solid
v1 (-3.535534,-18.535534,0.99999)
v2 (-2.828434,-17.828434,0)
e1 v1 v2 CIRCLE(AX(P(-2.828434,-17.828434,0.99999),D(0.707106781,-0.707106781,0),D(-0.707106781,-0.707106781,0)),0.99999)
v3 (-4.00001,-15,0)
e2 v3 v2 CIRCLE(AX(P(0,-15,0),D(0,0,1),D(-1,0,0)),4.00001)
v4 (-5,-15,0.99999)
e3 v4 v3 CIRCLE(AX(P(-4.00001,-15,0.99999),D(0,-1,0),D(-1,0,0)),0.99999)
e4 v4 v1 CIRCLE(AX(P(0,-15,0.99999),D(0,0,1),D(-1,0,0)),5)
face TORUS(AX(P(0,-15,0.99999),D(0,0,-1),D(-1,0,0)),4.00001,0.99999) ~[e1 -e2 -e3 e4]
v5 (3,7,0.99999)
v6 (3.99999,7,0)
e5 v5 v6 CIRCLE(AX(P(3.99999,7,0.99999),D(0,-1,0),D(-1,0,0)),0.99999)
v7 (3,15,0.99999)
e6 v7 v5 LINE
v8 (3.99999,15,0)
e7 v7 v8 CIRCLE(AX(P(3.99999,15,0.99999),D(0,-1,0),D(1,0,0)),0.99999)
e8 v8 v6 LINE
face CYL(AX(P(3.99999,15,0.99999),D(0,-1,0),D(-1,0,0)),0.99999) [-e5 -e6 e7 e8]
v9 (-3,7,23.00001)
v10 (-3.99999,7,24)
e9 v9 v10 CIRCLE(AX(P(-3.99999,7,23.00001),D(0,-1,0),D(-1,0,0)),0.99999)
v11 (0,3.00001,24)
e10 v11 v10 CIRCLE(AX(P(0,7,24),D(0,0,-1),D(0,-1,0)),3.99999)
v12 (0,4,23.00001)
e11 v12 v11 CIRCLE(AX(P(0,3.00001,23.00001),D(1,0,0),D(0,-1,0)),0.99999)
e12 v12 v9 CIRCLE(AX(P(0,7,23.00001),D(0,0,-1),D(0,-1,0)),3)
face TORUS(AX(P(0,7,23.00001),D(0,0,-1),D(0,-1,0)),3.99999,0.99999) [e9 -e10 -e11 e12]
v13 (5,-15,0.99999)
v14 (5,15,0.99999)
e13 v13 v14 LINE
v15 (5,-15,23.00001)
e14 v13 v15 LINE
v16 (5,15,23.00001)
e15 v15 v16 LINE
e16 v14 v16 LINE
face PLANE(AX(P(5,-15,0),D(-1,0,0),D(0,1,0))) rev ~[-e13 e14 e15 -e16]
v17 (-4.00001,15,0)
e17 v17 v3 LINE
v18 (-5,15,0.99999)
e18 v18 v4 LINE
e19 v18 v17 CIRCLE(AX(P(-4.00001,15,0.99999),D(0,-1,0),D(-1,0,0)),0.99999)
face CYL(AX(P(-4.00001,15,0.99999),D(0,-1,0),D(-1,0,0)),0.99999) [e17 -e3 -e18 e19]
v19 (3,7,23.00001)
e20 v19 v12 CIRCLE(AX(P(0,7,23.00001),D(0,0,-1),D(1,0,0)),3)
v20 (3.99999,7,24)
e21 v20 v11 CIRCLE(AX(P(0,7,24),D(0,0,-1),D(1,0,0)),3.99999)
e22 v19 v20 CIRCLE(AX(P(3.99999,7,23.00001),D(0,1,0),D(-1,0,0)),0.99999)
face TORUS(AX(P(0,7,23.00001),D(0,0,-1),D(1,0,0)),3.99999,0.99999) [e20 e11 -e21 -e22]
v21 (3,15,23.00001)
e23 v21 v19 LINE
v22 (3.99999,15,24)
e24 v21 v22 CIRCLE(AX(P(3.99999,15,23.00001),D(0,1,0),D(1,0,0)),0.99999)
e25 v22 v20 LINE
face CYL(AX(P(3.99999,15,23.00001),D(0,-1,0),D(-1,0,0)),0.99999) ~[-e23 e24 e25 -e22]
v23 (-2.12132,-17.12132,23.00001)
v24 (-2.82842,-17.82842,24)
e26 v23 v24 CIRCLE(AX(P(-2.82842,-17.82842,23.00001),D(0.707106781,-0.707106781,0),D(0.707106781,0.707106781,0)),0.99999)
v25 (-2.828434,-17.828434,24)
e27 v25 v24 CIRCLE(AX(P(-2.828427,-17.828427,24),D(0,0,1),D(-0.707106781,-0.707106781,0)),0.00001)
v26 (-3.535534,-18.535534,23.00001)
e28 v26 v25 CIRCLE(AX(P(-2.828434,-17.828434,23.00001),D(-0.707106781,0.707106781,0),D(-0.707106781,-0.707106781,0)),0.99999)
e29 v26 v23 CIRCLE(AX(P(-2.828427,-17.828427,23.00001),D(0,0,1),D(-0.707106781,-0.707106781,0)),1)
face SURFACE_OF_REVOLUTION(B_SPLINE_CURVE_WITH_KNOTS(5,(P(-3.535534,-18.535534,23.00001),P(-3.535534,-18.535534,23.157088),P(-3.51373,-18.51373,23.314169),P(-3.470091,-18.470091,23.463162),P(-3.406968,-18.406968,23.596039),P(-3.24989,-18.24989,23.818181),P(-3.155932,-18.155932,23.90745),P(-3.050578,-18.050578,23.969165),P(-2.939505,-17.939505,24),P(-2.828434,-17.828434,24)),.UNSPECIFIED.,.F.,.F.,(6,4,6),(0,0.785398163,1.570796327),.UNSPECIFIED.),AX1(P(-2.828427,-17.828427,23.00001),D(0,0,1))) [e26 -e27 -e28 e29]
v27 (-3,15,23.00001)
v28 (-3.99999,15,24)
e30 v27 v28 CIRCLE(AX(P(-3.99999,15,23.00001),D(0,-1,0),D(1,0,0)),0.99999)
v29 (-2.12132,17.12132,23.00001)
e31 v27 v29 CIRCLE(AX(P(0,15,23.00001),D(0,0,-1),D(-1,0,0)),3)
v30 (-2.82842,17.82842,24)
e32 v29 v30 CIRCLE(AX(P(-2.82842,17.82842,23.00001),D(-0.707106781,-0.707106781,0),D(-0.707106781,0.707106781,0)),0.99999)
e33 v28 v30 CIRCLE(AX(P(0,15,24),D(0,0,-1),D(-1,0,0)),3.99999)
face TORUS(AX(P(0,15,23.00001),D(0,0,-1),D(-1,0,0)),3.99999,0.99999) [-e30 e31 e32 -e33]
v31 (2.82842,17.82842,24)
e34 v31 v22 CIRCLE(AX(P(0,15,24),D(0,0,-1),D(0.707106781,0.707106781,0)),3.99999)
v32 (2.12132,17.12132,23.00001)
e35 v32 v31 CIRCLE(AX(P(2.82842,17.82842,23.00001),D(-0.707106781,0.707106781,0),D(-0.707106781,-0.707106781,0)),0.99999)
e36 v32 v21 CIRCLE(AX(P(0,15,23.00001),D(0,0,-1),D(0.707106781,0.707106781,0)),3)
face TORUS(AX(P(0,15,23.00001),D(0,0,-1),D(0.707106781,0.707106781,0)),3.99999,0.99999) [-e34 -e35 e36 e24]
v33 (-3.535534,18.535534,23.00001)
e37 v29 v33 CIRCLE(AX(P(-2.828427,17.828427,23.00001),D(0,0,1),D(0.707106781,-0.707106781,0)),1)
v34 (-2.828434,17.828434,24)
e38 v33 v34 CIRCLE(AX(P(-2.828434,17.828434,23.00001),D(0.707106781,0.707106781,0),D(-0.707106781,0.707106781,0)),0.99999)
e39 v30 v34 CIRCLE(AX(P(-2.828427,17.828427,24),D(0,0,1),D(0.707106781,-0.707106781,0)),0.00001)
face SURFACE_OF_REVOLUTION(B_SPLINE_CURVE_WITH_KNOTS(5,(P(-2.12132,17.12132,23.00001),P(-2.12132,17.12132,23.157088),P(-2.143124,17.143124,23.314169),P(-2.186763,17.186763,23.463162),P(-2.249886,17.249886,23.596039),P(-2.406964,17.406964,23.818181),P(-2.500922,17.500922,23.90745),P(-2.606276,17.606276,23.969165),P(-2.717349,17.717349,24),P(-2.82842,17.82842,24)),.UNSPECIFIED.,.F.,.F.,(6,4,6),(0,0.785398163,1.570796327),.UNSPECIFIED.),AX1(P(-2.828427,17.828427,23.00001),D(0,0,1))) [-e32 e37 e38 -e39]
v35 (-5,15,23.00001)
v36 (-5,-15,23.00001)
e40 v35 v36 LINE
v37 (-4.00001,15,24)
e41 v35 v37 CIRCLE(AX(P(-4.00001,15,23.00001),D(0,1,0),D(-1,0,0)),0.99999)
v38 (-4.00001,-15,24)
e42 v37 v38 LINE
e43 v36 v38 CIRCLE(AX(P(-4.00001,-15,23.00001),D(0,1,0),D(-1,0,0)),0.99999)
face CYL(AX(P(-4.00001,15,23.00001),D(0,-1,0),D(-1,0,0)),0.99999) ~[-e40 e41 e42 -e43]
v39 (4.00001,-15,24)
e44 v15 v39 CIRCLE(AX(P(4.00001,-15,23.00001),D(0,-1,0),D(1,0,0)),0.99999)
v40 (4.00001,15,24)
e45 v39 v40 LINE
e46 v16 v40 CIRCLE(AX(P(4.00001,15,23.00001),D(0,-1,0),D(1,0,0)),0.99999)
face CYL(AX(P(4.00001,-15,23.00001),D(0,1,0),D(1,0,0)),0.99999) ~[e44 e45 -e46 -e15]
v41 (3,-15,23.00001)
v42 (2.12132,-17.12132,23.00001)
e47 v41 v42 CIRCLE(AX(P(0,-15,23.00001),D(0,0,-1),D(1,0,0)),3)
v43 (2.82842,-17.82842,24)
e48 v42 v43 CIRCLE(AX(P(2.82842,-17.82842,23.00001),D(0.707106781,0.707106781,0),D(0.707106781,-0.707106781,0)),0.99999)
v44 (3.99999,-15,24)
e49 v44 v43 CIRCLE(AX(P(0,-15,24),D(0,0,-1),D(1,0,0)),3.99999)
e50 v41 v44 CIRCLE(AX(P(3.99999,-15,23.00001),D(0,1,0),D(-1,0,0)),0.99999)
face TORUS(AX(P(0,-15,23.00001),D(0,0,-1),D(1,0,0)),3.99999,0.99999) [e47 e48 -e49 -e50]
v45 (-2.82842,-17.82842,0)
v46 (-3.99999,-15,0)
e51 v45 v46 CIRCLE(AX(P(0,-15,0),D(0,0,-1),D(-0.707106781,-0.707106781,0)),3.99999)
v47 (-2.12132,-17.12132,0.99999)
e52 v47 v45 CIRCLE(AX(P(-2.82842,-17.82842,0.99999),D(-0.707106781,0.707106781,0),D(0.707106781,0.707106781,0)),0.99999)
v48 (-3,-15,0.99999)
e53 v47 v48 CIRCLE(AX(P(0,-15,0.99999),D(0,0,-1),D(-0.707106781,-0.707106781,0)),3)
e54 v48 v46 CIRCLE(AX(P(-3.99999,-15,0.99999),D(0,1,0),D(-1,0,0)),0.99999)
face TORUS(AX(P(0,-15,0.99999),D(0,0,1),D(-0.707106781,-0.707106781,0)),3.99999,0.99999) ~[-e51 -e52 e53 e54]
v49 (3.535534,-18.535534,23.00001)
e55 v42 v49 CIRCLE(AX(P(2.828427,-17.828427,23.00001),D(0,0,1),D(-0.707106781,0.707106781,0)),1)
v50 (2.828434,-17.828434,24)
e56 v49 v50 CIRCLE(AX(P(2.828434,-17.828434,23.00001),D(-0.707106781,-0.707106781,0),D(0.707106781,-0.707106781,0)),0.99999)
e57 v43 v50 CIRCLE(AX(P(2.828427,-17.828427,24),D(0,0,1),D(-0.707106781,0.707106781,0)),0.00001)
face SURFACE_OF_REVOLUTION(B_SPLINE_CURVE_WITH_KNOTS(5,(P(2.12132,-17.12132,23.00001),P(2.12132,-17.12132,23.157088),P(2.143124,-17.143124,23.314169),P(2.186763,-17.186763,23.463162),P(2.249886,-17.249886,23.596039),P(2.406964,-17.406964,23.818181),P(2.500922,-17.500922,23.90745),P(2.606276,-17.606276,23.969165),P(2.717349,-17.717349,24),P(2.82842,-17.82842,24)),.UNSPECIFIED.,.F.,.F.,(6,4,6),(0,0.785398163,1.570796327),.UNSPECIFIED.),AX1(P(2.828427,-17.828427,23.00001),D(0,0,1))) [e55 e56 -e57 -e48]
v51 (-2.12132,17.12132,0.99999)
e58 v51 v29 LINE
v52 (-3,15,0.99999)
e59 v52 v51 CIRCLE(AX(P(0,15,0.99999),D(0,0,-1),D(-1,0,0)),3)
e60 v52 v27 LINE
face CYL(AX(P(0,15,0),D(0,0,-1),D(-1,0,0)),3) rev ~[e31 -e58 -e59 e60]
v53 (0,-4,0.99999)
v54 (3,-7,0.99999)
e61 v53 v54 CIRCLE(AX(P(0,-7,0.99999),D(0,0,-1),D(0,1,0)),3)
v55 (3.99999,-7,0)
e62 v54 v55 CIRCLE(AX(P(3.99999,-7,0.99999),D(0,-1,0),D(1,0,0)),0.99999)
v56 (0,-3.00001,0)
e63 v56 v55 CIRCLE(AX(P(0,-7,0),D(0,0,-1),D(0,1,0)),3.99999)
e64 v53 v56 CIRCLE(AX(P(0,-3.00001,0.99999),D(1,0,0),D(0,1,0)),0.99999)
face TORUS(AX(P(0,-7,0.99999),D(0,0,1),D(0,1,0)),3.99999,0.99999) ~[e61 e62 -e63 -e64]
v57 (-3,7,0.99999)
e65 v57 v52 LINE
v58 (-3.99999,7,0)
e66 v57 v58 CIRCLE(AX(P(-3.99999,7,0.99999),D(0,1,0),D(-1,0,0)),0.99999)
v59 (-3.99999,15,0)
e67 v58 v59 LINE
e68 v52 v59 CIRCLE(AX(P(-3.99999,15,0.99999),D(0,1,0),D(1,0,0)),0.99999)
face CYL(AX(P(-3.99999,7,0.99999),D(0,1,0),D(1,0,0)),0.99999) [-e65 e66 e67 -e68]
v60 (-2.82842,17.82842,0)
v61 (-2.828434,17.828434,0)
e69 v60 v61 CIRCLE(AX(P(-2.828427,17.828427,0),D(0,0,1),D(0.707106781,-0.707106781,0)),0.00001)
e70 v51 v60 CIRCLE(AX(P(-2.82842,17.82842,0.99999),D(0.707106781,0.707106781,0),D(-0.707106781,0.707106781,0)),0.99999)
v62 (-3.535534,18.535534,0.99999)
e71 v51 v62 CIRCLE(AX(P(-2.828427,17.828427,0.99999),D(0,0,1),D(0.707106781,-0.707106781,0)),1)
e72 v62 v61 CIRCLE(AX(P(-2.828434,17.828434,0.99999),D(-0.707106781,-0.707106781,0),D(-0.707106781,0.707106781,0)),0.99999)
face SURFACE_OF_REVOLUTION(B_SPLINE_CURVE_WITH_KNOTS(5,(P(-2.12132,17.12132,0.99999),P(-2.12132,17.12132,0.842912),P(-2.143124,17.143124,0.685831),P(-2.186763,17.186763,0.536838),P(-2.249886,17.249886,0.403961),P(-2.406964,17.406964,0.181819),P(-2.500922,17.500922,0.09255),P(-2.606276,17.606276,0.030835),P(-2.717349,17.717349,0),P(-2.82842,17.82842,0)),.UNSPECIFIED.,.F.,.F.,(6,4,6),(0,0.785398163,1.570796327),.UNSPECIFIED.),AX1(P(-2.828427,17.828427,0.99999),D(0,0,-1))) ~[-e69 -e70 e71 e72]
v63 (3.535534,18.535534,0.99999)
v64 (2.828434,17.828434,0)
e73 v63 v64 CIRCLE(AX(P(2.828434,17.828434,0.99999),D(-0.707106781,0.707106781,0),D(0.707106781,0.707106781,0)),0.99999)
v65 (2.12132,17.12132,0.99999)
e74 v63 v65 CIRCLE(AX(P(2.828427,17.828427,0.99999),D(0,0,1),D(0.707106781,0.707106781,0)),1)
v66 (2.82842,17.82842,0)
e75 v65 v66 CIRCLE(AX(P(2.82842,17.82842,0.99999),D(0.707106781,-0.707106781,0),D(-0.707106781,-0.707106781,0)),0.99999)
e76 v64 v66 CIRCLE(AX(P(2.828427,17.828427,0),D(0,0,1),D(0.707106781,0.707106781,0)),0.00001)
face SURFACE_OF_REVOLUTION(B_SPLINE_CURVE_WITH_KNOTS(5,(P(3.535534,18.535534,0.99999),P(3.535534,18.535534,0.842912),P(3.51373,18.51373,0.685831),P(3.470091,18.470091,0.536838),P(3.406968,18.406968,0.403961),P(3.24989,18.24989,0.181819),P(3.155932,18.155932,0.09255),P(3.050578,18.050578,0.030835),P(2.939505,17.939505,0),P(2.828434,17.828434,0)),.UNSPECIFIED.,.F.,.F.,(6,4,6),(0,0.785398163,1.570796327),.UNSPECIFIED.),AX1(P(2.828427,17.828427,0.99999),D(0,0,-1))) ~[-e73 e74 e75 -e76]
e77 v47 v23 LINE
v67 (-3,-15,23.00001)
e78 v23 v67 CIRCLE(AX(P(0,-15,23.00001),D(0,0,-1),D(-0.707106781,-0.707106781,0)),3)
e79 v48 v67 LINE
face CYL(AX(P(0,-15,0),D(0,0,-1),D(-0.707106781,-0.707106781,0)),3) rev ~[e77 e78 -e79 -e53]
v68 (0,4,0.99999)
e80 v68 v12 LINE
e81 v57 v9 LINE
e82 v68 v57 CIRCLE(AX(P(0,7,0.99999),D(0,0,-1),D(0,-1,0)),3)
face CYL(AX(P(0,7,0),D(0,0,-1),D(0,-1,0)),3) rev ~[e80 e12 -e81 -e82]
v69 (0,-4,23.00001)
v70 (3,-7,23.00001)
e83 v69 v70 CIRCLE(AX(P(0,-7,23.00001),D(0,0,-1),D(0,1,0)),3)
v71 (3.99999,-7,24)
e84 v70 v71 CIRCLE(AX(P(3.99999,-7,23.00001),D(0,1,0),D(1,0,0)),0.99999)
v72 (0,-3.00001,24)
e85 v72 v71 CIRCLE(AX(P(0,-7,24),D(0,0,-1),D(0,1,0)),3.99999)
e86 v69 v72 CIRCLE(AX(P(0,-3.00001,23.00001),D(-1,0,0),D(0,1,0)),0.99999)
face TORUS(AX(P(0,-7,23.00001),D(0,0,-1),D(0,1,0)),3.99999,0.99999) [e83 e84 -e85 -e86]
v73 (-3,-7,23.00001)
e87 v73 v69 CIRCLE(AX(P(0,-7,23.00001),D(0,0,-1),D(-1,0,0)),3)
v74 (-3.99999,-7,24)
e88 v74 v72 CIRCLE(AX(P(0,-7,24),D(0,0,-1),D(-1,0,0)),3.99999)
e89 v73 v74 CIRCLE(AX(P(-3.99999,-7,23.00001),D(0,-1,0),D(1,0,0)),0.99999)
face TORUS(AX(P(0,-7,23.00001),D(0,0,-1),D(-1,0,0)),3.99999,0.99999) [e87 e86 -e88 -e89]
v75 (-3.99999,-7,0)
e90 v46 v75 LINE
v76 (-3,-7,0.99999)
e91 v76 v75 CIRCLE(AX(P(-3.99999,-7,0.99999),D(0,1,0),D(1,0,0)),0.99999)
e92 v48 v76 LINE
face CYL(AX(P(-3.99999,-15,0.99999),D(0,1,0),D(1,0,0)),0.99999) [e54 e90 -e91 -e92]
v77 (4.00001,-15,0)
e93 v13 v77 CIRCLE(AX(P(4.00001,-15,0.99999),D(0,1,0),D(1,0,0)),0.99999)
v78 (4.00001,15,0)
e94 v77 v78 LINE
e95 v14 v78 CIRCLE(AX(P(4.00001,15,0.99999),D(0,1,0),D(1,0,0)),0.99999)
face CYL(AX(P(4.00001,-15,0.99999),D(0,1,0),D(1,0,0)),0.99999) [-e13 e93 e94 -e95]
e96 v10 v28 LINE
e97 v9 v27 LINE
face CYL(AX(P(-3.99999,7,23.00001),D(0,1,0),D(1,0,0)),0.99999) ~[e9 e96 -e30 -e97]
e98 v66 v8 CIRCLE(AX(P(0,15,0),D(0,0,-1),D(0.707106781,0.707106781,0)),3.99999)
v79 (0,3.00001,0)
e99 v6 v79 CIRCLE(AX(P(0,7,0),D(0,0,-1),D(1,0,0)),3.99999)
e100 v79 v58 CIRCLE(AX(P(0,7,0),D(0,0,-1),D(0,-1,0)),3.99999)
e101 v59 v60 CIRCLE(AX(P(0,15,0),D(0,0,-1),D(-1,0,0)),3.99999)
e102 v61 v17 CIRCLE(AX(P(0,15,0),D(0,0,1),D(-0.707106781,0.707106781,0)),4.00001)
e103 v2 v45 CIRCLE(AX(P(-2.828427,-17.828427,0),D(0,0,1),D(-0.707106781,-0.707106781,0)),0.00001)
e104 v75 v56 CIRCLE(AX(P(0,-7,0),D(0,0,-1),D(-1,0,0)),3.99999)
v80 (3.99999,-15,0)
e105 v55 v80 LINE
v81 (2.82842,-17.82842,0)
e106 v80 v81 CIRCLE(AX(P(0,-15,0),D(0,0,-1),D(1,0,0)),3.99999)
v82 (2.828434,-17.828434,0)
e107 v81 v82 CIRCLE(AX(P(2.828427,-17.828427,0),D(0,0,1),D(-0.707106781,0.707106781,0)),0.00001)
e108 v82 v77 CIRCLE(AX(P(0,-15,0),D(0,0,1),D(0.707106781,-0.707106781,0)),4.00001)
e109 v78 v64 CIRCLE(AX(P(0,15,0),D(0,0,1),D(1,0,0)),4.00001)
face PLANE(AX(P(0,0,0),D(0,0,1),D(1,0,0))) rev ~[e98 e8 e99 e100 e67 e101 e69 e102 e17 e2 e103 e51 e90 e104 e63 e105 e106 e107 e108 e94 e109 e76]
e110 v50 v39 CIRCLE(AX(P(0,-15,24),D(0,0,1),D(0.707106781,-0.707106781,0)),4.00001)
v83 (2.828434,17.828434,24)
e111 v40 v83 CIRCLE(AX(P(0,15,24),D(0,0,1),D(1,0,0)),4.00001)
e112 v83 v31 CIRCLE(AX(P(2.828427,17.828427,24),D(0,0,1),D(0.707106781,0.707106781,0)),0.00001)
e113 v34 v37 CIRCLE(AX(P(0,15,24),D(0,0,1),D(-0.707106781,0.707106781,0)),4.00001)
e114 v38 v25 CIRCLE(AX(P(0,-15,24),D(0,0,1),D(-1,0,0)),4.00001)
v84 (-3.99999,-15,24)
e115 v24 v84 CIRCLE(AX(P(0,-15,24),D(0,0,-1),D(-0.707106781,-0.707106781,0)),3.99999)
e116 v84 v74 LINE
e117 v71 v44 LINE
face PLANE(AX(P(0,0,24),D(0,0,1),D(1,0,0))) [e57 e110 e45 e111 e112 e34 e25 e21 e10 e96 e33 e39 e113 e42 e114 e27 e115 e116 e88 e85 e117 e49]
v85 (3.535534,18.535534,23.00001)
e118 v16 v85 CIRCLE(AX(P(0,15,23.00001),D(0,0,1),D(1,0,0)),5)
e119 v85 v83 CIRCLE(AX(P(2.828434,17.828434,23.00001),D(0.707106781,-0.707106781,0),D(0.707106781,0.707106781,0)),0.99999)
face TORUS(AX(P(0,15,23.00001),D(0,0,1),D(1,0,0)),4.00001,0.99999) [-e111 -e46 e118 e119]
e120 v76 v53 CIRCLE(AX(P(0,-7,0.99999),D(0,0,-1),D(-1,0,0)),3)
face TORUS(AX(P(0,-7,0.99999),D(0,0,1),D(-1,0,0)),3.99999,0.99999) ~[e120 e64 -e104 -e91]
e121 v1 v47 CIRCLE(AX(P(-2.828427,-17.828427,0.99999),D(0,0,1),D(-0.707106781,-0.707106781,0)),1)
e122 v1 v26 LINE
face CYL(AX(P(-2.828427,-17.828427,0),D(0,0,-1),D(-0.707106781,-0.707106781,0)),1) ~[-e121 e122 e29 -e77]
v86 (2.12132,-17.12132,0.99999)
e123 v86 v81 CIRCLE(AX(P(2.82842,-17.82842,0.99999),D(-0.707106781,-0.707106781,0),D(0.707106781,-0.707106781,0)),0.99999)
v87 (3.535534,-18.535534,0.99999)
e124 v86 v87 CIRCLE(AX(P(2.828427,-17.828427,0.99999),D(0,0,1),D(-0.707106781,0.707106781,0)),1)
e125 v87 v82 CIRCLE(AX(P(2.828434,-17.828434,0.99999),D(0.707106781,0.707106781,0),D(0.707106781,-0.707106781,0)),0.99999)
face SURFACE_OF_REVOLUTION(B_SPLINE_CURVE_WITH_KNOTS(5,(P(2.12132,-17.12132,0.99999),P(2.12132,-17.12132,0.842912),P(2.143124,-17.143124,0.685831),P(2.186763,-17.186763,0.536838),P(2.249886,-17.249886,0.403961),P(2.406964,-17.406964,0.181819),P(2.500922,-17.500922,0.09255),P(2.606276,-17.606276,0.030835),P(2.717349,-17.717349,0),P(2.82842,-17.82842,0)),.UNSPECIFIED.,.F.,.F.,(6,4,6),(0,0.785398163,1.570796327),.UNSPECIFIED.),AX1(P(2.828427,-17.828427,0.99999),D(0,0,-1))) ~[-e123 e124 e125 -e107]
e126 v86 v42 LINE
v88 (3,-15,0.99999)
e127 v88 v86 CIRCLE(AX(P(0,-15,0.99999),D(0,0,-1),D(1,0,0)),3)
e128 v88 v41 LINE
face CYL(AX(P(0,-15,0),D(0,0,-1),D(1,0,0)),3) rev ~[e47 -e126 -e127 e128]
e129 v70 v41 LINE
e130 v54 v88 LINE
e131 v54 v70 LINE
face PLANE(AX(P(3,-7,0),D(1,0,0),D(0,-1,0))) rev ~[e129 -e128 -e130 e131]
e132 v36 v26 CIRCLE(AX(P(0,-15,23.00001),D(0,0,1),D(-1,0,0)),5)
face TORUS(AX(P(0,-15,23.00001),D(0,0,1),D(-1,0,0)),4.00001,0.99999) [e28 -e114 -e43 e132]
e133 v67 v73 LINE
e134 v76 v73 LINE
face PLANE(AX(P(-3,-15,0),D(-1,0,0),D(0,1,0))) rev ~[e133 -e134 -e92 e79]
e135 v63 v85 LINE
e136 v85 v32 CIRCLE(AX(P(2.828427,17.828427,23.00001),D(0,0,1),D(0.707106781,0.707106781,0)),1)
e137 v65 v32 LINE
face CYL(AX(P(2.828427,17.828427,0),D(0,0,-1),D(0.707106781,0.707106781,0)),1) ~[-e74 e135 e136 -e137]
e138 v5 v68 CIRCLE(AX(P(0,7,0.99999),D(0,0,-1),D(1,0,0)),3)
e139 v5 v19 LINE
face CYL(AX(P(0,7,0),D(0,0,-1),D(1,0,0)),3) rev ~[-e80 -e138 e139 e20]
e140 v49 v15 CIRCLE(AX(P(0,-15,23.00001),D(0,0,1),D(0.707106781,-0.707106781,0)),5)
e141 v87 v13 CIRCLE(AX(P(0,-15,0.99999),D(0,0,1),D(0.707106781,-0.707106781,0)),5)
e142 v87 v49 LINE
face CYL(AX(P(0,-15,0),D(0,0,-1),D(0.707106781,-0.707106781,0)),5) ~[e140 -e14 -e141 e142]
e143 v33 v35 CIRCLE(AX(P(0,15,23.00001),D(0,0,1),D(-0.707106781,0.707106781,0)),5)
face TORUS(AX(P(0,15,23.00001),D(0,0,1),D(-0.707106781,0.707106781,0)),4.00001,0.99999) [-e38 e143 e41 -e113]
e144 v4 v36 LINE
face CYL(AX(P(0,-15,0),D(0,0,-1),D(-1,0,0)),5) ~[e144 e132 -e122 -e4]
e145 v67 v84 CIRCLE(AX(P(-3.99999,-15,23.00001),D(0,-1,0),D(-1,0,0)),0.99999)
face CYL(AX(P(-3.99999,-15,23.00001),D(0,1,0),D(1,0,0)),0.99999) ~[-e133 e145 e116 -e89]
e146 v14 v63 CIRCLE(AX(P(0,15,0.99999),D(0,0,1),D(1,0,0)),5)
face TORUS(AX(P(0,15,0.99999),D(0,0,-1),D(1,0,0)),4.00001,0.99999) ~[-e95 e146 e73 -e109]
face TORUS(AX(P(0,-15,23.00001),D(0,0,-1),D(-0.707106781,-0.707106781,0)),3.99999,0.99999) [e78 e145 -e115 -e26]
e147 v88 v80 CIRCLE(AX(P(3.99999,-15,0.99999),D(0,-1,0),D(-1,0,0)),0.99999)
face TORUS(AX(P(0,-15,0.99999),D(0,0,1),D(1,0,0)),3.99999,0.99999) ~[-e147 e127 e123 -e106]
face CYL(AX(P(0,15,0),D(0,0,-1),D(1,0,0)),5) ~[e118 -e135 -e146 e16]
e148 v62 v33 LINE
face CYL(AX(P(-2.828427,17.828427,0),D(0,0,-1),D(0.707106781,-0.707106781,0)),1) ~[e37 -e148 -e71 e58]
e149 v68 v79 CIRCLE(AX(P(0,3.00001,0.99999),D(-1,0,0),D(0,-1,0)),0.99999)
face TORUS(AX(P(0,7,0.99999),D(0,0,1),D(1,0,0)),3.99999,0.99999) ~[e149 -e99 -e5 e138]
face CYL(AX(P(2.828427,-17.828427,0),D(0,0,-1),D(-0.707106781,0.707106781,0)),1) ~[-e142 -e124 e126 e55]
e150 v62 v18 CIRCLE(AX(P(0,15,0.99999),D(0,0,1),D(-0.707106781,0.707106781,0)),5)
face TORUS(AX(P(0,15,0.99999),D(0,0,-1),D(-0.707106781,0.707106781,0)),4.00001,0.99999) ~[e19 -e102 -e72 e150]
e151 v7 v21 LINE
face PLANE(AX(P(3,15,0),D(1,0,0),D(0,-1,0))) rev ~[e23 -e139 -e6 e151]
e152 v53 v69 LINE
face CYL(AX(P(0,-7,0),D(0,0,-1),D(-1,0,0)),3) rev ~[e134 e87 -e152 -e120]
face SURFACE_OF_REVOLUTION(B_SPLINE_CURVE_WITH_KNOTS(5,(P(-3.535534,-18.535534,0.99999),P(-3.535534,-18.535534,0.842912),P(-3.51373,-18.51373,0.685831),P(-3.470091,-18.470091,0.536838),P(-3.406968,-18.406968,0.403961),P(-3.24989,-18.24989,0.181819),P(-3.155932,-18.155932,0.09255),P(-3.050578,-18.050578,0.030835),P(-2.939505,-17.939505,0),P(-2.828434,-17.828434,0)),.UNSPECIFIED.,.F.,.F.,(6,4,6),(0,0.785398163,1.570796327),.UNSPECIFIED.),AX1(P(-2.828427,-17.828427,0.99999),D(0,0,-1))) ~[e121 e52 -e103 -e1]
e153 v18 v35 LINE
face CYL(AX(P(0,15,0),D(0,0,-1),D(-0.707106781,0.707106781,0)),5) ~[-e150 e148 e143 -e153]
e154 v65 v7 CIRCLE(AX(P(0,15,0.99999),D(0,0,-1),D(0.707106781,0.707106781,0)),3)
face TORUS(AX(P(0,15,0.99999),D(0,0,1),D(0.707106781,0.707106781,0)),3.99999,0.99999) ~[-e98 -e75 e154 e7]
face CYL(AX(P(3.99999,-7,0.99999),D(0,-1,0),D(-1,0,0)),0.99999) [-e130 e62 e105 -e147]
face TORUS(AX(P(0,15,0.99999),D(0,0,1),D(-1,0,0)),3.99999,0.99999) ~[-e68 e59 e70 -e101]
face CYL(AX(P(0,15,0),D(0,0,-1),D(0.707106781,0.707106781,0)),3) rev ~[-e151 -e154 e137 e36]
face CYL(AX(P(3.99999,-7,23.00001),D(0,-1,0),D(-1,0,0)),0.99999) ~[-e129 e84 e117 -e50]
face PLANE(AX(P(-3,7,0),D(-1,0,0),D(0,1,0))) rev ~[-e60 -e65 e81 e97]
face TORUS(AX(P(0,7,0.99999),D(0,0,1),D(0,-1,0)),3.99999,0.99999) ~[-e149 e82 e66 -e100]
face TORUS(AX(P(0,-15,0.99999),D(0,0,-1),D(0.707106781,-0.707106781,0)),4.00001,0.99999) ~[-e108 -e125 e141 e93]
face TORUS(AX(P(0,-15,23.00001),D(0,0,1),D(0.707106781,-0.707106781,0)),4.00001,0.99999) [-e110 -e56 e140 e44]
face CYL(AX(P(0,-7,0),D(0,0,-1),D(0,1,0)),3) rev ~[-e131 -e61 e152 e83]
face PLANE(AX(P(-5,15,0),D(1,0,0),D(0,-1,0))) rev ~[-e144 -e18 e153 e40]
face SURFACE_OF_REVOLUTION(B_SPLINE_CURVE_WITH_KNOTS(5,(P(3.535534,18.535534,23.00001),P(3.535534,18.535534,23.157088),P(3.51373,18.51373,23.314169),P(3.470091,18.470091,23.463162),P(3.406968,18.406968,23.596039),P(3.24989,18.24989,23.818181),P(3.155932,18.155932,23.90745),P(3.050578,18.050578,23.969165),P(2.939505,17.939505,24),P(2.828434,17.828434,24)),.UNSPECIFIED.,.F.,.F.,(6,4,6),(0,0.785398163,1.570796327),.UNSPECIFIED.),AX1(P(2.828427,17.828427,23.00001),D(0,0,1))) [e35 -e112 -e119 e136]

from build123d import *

# Parameters (mm, degrees)
F2_DEPTH = 24
F3_R     = 0.99999


# Not quite as in the source:
# - a fillet or chamfer is up to 0.001 mm smaller than in the source, because OpenCascade refuses the exact size


with BuildPart() as f2:
    # F0 (on Top) → F2 (new body)
    with BuildSketch(Plane.XY):
        with BuildLine():
            ThreePointArc((-2.1213203436, 17.1213203436), (-2.1213203436, 18.5355339059), (-3.5355339059, 18.5355339059))
            ThreePointArc((-3.5355339059, 18.5355339059), (-4.6193976626, 16.9134171618), (-5, 15))
            Line((-5, 15), (-5, 0))
            Line((-5, 0), (-5, -15))
            ThreePointArc((-5, -15), (-4.6193976626, -16.9134171618), (-3.5355339059, -18.5355339059))
            ThreePointArc((-3.5355339059, -18.5355339059), (-2.1213203436, -18.5355339059), (-2.1213203436, -17.1213203436))
            ThreePointArc((-2.1213203436, -17.1213203436), (-2.7716385975, -16.1480502971), (-3, -15))
            Line((-3, -15), (-3, -7))
            ThreePointArc((-3, -7), (-2.1213203436, -4.8786796564), (0, -4))
            ThreePointArc((0, -4), (2.1213203436, -4.8786796564), (3, -7))
            Line((3, -7), (3, -15))
            ThreePointArc((3, -15), (2.7716385975, -16.1480502971), (2.1213203436, -17.1213203436))
            ThreePointArc((2.1213203436, -17.1213203436), (2.1213203436, -18.5355339059), (3.5355339059, -18.5355339059))
            ThreePointArc((3.5355339059, -18.5355339059), (4.6193976626, -16.9134171618), (5, -15))
            Line((5, -15), (5, 0))
            Line((5, 0), (5, 15))
            ThreePointArc((5, 15), (4.6193976626, 16.9134171618), (3.5355339059, 18.5355339059))
            ThreePointArc((3.5355339059, 18.5355339059), (2.1213203436, 18.5355339059), (2.1213203436, 17.1213203436))
            ThreePointArc((2.1213203436, 17.1213203436), (2.7716385975, 16.1480502971), (3, 15))
            Line((3, 15), (3, 7))
            ThreePointArc((3, 7), (2.1213203436, 4.8786796564), (0, 4))
            ThreePointArc((0, 4), (-2.1213203436, 4.8786796564), (-3, 7))
            Line((-3, 7), (-3, 15))
            ThreePointArc((-3, 15), (-2.7716385975, 16.1480502971), (-2.1213203436, 17.1213203436))
        make_face()
    extrude(amount=F2_DEPTH)

    # F3 (radius 1 in the source; OpenCascade refuses exactly that, so slightly less here)
    f3_edges = [f2.edges().sort_by_distance(p)[0] for p in [
        (5, 0, 24),
        (4.619398, 16.913417, 24),
        (2.12132, 18.535534, 24),
        (2.771639, 16.14805, 24),
        (3, 11, 24),
        (0, 4, 24),
        (-3, 11, 24),
        (-2.771639, 16.14805, 24),
        (-2.12132, 18.535534, 24),
        (-4.619398, 16.913417, 24),
        (-5, 0, 24),
        (-4.619398, -16.913417, 24),
        (-2.12132, -18.535534, 24),
        (-2.771639, -16.14805, 24),
        (-3, -11, 24),
        (0, -4, 24),
        (3, -11, 24),
        (2.771639, -16.14805, 24),
        (2.12132, -18.535534, 24),
        (4.619398, -16.913417, 24),
        (5, 0, 0),
        (4.619398, 16.913417, 0),
        (2.12132, 18.535534, 0),
        (2.771639, 16.14805, 0),
        (3, 11, 0),
        (0, 4, 0),
        (-3, 11, 0),
        (-2.771639, 16.14805, 0),
        (-2.12132, 18.535534, 0),
        (-4.619398, 16.913417, 0),
        (-5, 0, 0),
        (-4.619398, -16.913417, 0),
        (-2.12132, -18.535534, 0),
        (-2.771639, -16.14805, 0),
        (-3, -11, 0),
        (0, -4, 0),
        (3, -11, 0),
        (2.771639, -16.14805, 0),
        (2.12132, -18.535534, 0),
        (4.619398, -16.913417, 0),
    ]]
    fillet(f3_edges, radius=F3_R)


solid = f2.part
